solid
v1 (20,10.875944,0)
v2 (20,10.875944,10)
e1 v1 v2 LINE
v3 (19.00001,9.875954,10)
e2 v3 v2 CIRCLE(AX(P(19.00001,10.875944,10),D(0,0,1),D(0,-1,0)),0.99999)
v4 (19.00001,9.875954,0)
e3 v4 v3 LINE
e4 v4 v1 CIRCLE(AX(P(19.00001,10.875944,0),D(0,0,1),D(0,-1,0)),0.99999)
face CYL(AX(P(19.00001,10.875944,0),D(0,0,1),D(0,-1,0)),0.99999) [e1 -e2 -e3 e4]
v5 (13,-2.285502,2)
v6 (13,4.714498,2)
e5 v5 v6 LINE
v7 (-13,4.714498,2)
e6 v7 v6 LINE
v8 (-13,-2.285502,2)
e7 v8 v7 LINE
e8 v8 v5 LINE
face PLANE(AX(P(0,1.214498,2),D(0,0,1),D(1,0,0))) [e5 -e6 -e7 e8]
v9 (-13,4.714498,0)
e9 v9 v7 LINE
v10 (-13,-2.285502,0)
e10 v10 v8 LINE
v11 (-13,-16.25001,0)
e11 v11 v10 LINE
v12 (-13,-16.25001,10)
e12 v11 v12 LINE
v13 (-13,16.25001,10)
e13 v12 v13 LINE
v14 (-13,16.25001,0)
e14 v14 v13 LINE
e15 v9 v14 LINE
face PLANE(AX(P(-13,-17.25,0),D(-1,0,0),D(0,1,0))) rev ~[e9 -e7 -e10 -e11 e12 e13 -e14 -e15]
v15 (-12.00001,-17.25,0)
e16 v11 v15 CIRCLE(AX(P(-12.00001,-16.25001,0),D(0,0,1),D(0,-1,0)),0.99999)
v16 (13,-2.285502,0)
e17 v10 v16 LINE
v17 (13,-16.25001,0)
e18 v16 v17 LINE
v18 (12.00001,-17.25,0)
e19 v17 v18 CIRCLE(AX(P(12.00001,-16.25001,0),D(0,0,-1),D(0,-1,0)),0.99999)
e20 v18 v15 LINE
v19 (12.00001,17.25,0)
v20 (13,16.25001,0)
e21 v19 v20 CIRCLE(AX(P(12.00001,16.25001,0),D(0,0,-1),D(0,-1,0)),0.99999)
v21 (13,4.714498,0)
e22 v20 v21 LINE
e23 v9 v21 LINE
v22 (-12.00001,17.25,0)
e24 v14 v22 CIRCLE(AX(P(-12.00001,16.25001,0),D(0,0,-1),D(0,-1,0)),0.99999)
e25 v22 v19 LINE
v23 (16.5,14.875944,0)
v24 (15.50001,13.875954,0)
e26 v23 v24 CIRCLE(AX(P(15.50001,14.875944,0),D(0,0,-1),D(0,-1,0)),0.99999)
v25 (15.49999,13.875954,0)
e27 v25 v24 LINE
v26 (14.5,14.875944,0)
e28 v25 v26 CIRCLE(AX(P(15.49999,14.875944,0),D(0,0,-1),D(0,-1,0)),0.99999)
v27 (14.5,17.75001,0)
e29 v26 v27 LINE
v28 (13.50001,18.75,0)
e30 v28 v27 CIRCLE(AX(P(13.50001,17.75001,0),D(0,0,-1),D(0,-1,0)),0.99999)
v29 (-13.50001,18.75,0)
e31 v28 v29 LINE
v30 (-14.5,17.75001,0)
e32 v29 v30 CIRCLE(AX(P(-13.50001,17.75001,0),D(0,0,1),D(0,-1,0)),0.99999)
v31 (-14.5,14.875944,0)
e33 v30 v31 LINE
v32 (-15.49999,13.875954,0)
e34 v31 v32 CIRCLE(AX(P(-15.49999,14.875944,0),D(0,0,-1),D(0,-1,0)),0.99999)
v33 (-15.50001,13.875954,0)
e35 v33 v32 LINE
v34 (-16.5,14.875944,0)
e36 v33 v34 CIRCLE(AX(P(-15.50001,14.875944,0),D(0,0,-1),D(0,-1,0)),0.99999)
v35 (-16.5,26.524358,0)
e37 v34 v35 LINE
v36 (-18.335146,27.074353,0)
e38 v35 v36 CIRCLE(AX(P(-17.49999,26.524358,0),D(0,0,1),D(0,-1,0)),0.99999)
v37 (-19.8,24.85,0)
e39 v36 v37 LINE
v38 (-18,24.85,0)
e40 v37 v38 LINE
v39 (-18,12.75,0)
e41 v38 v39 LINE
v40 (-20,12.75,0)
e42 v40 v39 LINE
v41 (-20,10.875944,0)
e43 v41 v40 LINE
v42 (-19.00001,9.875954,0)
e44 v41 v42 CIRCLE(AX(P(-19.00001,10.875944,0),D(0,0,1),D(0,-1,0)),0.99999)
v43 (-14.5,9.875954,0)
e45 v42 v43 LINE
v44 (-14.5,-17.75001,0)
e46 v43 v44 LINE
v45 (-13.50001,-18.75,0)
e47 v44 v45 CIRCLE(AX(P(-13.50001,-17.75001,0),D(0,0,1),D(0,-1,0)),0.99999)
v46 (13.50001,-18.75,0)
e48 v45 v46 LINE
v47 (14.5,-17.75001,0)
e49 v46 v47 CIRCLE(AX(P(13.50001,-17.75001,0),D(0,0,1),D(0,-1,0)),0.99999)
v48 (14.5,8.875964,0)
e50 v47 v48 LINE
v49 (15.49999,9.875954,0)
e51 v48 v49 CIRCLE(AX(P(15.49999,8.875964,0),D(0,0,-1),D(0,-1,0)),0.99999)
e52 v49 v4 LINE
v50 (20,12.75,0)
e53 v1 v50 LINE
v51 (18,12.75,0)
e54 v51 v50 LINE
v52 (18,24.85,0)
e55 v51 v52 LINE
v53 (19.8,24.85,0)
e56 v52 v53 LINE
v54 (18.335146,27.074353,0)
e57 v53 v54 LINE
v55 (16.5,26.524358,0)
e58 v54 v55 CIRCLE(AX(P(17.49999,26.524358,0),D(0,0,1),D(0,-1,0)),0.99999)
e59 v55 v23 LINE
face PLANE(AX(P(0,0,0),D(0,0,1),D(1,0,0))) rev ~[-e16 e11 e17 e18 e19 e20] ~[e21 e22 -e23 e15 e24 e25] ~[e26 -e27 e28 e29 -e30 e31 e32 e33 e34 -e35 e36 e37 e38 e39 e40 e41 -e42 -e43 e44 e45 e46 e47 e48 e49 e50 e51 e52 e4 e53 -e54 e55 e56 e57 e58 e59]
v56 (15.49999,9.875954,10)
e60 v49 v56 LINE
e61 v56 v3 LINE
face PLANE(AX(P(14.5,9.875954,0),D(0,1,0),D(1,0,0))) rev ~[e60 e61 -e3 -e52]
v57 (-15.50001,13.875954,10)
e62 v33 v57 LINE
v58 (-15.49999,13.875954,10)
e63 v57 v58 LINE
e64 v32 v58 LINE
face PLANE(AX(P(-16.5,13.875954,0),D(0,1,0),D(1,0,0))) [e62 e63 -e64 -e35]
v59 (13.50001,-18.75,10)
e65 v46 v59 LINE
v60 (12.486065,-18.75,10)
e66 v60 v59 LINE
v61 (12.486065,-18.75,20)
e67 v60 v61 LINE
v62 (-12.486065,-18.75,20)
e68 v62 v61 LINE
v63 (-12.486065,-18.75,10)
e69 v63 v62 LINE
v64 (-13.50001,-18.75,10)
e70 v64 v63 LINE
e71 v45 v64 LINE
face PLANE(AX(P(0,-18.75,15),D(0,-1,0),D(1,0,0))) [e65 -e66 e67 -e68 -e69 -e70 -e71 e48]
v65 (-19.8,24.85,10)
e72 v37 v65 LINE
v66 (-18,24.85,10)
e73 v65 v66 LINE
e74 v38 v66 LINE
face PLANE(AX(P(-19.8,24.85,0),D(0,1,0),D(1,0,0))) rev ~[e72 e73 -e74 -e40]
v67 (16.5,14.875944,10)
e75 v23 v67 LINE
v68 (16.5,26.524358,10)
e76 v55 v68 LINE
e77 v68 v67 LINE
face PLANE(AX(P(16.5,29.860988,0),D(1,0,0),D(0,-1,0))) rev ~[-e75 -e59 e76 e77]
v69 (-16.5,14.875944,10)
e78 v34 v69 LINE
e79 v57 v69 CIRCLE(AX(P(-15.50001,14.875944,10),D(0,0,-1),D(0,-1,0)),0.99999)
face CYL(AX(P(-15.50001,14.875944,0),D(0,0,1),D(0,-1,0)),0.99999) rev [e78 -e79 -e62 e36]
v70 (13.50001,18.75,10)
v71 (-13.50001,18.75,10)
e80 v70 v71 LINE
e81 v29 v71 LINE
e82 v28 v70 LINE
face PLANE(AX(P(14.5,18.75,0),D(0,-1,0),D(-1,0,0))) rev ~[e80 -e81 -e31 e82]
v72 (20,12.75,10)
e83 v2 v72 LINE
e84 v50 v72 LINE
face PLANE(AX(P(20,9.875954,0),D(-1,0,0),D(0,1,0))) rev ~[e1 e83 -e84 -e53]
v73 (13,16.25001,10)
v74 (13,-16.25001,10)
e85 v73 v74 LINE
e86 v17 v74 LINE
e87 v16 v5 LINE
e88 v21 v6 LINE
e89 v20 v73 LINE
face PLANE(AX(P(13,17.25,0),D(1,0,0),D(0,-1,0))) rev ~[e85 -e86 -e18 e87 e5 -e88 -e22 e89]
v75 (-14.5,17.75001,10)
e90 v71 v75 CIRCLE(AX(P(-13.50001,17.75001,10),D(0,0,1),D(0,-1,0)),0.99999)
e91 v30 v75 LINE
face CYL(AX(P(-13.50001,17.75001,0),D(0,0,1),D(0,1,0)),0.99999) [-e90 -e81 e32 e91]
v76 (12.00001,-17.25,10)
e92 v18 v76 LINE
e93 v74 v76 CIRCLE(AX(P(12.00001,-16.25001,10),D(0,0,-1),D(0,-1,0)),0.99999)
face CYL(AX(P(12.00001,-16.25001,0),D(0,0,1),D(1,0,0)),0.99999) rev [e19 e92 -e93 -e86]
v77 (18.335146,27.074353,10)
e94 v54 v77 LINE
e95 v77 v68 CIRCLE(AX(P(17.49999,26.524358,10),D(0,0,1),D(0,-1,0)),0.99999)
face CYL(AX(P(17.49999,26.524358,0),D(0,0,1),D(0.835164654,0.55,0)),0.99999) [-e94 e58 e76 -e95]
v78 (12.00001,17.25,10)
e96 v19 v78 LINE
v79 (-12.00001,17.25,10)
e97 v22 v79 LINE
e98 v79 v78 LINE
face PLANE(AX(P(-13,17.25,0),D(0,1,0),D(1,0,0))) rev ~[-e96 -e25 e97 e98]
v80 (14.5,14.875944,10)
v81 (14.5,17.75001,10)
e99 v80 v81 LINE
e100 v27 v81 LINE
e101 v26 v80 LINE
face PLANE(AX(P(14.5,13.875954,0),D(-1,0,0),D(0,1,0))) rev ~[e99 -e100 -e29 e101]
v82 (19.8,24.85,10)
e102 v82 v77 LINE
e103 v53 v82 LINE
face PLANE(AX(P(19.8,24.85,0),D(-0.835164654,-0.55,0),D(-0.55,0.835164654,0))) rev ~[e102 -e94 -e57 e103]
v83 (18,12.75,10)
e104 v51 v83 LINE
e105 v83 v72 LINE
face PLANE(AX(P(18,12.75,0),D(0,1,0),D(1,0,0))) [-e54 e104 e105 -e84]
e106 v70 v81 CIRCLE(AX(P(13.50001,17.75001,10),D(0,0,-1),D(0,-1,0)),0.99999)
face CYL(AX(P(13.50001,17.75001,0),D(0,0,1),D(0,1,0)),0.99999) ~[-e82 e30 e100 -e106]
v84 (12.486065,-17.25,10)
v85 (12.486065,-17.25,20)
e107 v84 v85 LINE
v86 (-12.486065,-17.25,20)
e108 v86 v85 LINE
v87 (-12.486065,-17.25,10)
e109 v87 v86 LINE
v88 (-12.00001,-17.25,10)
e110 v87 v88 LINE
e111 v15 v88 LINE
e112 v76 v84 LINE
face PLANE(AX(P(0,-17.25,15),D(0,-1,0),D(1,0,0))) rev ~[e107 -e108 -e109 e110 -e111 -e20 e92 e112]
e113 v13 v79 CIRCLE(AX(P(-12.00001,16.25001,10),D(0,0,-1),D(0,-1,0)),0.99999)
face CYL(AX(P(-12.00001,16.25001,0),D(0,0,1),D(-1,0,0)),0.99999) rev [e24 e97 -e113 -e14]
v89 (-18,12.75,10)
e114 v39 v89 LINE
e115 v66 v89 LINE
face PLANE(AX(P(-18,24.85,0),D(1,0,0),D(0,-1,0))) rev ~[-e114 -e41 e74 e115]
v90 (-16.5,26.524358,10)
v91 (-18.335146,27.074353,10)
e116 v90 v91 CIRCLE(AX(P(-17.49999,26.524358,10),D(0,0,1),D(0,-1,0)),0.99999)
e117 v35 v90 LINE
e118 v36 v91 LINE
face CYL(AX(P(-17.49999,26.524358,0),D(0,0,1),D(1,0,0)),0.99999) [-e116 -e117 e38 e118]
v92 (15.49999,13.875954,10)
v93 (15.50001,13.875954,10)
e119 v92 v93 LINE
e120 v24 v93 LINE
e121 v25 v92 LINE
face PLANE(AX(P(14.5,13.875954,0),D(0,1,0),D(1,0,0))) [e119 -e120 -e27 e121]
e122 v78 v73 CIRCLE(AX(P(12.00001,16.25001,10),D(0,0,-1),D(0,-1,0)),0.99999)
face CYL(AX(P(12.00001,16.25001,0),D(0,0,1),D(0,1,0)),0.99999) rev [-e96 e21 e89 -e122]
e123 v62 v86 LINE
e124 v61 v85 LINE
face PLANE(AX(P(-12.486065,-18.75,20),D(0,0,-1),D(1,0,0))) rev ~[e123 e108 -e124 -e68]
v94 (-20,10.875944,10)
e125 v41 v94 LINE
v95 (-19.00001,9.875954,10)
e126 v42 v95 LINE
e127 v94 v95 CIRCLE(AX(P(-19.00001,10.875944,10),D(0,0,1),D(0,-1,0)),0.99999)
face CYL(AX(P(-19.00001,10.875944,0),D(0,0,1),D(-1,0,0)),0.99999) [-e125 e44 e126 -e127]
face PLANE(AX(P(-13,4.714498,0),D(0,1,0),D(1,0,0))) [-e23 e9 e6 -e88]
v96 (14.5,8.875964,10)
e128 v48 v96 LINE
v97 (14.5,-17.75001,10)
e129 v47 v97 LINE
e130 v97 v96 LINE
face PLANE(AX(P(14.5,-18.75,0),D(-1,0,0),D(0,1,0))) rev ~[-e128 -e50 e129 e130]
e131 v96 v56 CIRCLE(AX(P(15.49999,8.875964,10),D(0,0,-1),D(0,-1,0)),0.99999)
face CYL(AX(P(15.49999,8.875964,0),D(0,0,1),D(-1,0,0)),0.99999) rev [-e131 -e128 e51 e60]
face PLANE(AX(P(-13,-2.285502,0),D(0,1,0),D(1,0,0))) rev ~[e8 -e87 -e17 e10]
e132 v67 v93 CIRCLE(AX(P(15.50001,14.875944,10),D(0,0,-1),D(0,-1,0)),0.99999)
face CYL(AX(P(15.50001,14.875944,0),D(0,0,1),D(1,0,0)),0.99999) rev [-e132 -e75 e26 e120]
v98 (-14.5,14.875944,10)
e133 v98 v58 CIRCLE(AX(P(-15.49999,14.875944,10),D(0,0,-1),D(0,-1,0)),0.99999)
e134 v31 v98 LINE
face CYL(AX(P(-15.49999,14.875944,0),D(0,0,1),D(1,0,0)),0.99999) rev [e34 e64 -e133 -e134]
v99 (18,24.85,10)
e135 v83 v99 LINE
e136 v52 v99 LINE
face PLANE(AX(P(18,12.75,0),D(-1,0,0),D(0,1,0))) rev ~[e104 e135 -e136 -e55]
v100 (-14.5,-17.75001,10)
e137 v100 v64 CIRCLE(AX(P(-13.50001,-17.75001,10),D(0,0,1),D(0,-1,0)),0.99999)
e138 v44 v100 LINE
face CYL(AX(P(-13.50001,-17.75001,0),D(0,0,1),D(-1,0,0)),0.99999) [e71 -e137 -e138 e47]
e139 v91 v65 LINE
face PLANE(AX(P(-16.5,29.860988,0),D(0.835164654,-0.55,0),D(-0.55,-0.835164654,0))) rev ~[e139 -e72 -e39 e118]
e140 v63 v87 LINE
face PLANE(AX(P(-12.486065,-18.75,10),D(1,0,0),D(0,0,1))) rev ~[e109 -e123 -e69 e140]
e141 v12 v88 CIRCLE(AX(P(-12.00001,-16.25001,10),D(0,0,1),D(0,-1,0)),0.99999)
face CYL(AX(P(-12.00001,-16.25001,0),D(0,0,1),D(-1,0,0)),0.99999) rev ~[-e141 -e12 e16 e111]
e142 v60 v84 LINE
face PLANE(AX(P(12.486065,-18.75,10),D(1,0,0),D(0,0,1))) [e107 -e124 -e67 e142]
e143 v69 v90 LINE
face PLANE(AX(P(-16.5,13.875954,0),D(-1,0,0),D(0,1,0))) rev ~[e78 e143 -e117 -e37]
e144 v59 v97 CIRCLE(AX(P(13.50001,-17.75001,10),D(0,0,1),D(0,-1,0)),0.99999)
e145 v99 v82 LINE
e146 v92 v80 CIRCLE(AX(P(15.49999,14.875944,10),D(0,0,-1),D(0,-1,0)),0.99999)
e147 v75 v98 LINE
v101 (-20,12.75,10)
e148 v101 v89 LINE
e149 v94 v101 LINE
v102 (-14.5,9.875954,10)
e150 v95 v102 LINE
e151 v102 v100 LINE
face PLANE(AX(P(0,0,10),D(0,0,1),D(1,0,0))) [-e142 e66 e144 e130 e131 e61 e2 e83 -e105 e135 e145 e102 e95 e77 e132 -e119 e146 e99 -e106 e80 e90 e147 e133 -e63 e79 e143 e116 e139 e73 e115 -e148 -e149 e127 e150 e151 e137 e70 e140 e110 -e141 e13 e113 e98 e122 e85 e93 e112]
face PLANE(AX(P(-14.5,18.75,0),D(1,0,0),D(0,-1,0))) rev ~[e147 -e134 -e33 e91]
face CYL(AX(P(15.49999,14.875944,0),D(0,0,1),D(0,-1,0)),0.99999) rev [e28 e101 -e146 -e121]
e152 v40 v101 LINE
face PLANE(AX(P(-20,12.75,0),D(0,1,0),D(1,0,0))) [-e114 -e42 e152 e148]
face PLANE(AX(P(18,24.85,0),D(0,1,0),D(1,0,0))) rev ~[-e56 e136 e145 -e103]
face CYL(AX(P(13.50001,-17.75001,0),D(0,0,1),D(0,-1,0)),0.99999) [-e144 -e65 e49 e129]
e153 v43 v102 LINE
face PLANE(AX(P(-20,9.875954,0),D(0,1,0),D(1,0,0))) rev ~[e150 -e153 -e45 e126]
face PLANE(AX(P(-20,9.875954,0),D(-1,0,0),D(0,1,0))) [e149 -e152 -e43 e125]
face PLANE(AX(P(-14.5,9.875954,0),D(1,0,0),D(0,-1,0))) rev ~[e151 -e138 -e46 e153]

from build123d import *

# Parameters (mm, degrees)
F0_W     = 2
F0_H     = 4
F0_H_2   = 2.8740456328
F1_DEPTH = 10
F2_R     = 0.99999
F0_W_2   = 26
F0_H_3   = 7
F3_DEPTH = 2
F4_W     = 24.9721305105
F4_H     = 10
F5_DEPTH = 1.5


# Not quite as in the source:
# - a fillet or chamfer is up to 0.001 mm smaller than in the source, because OpenCascade refuses the exact size


with BuildPart() as f1:
    # F0 (on Top) → F1 (new body)
    with BuildSketch(Plane.XY):
        Polygon((14.5, 18.75), (-14.5, 18.75), (-14.5, 13.8759543672), (-14.5, 9.8759543672), (-14.5, -18.75), (14.5, -18.75), (14.5, 9.8759543672), (14.5, 13.8759543672), align=None)
        Polygon((-13, 4.7144976147), (-13, 17.25), (13, 17.25), (13, 4.7144976147), (13, -2.2855023853), (13, -17.25), (-13, -17.25), (-13, -2.2855023853), align=None, mode=Mode.SUBTRACT)
        with Locations((-15.5, 11.8759543672)):
            Rectangle(F0_W, F0_H)
        Polygon((-16.5, 9.8759543672), (-16.5, 13.8759543672), (-16.5, 29.8609879265), (-19.8, 24.85), (-18, 24.85), (-18, 12.75), (-18, 9.8759543672), align=None)
        with Locations((15.5, 11.8759543672)):
            Rectangle(F0_W, F0_H)
        Polygon((16.5, 29.8609879265), (16.5, 13.8759543672), (16.5, 9.8759543672), (18, 9.8759543672), (18, 12.75), (18, 24.85), (19.8, 24.85), align=None)
        with Locations((-19, 11.3129771836)):
            Rectangle(F0_W, F0_H_2)
        with Locations((19, 11.3129771836)):
            Rectangle(F0_W, F0_H_2)
    extrude(amount=F1_DEPTH)

    # F2 (radius 1 in the source; OpenCascade refuses exactly that, so slightly less here)
    f2_edges = [f1.edges().sort_by_distance(p)[0] for p in [
        (-14.5, 18.75, 5),
        (-20, 9.875954, 5),
        (14.5, 18.75, 5),
        (20, 9.875954, 5),
        (-13, 17.25, 5),
        (14.5, 9.875954, 5),
        (14.5, -18.75, 5),
        (-14.5, -18.75, 5),
        (-13, -17.25, 5),
        (13, 17.25, 5),
        (13, -17.25, 5),
        (-14.5, 13.875954, 5),
        (16.5, 13.875954, 5),
        (-16.5, 13.875954, 5),
        (14.5, 13.875954, 5),
        (-16.5, 29.860988, 5),
        (16.5, 29.860988, 5),
    ]]
    fillet(f2_edges, radius=F2_R)

    # F0 (on Top) → F3 (join)
    with BuildSketch(Plane.XY):
        with Locations((0, 1.2144976147)):
            Rectangle(F0_W_2, F0_H_3)
    extrude(amount=F3_DEPTH)

    # F4 (on face) → F5 (join)
    with BuildSketch(Plane.XZ.offset(18.75)):
        with Locations((0, 15)):
            Rectangle(F4_W, F4_H)
    extrude(amount=-F5_DEPTH)


solid = f1.part
